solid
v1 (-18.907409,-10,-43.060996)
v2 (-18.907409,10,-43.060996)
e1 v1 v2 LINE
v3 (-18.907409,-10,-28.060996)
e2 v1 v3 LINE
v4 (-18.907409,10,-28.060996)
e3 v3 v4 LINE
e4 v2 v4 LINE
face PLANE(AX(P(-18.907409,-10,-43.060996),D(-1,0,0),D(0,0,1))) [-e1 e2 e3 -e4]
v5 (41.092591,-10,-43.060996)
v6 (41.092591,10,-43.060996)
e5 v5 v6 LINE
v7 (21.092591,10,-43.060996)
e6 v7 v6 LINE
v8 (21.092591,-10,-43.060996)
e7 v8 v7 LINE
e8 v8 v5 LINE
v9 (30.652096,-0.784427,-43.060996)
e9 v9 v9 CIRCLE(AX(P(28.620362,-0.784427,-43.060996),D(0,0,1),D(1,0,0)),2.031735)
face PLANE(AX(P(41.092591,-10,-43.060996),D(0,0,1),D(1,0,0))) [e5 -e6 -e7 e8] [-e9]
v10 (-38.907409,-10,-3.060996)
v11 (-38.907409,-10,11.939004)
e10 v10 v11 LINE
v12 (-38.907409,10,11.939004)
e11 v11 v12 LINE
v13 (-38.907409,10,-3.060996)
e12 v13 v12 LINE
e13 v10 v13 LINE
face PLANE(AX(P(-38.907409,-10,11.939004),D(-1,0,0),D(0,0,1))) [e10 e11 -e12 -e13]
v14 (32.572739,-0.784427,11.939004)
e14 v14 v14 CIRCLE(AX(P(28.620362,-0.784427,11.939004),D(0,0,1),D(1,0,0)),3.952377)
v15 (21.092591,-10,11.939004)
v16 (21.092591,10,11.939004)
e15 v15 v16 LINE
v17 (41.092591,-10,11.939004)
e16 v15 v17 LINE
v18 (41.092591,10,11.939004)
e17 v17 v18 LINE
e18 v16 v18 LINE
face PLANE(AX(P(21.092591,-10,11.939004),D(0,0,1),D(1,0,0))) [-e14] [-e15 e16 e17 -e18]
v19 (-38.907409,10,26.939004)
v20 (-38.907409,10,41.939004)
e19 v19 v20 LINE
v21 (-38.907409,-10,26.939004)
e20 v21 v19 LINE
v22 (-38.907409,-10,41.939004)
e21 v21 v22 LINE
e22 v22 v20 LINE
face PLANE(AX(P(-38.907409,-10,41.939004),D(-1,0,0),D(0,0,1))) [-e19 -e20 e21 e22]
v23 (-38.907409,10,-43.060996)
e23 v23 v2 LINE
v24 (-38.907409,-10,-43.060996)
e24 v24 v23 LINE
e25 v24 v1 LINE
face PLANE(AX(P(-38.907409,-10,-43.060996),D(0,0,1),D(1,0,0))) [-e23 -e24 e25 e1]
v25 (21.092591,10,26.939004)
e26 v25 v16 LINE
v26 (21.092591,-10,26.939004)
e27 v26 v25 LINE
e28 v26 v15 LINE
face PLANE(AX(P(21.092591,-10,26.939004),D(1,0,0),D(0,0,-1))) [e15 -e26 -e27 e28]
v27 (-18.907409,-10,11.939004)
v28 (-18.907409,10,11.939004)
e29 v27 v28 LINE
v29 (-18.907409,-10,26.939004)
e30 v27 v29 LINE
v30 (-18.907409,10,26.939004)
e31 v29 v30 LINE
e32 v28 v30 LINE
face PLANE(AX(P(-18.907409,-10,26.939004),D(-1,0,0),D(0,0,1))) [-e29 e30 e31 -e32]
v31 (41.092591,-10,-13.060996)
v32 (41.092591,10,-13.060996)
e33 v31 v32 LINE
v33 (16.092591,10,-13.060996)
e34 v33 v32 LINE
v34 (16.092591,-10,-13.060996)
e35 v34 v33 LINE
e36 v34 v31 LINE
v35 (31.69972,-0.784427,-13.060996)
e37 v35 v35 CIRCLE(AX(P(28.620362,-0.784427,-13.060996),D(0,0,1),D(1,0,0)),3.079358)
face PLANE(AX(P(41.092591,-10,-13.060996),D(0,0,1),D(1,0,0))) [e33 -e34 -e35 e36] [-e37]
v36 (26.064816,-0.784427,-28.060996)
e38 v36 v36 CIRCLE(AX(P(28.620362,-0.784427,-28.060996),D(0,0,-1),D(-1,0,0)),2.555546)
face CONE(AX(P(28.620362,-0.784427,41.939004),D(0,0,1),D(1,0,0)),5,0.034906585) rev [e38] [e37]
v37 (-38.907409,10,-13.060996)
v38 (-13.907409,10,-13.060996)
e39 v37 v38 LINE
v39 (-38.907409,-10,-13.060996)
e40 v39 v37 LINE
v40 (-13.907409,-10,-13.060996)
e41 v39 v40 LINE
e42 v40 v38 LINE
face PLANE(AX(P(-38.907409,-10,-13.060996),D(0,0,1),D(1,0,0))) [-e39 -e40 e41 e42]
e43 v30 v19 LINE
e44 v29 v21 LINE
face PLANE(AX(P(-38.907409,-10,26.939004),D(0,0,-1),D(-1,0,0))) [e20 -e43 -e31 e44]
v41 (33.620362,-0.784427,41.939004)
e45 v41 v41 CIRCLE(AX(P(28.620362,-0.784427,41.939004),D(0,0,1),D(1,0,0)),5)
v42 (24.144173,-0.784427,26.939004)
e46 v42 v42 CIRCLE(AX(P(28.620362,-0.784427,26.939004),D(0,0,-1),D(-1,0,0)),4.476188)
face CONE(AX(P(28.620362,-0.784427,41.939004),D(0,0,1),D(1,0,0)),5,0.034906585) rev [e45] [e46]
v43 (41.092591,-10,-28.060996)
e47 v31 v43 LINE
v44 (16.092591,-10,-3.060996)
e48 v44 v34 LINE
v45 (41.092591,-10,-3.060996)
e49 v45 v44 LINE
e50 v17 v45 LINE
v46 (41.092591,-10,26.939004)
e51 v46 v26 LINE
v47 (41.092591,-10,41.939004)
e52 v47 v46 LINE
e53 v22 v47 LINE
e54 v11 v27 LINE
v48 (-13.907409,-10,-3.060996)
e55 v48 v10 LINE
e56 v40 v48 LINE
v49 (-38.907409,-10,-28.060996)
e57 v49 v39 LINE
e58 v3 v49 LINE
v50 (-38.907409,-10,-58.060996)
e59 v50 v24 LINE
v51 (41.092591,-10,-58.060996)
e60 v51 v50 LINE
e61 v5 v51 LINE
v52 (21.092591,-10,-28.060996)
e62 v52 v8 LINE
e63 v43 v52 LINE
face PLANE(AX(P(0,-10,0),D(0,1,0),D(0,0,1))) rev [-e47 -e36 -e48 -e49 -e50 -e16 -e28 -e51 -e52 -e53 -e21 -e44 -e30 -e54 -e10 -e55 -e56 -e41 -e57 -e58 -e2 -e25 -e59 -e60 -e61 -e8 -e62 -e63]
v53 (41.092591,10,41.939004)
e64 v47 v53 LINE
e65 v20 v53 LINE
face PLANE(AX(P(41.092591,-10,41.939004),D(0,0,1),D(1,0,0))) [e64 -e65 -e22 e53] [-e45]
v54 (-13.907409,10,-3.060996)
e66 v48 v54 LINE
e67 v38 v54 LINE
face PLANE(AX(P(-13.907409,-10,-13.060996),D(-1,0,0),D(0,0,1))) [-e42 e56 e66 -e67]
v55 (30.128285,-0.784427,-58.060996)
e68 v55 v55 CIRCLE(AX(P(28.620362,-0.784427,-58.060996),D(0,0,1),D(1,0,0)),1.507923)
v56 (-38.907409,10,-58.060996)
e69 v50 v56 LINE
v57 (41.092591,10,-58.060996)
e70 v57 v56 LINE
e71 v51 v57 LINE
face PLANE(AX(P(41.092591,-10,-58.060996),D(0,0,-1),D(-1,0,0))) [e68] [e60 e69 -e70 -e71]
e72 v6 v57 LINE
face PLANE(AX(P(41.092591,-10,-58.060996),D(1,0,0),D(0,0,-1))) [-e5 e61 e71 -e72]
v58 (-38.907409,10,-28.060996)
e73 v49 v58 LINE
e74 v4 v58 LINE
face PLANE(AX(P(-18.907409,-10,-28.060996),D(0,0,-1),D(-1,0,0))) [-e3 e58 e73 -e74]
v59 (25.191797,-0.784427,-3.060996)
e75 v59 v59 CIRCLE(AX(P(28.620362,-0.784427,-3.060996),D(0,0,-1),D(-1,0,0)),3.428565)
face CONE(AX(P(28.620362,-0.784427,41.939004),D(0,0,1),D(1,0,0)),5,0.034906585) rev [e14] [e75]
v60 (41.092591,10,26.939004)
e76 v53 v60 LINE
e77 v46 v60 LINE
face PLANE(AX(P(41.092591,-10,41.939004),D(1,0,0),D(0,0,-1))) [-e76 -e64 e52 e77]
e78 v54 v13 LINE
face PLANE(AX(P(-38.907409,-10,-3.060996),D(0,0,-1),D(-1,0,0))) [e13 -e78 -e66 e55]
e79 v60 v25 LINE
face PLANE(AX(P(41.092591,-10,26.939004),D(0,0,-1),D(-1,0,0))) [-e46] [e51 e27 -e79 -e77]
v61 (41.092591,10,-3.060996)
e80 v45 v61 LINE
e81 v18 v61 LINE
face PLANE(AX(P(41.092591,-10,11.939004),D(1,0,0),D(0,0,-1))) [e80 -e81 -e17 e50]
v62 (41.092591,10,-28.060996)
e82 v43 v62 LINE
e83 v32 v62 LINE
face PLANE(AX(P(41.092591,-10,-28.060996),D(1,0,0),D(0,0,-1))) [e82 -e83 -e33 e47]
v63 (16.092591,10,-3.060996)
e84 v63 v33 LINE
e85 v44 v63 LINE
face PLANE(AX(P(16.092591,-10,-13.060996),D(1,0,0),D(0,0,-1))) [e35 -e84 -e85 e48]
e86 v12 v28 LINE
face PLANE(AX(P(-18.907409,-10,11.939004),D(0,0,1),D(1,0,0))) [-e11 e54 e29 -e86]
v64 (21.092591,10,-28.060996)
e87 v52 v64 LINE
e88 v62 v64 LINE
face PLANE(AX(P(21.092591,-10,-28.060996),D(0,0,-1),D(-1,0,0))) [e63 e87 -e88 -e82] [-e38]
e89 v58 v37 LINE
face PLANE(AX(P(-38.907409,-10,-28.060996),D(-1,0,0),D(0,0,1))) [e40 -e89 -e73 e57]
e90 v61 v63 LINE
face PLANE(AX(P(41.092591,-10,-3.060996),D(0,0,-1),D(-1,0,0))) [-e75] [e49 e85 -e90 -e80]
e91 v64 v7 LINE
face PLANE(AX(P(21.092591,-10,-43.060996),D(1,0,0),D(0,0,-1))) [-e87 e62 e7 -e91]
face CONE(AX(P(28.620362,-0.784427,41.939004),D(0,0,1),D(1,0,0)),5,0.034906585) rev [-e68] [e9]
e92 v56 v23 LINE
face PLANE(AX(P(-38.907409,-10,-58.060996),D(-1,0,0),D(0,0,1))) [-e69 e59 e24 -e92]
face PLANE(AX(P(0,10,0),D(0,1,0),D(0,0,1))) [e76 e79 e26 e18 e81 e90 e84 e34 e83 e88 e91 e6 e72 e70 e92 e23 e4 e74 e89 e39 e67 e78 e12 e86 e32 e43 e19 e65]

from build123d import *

# Parameters (mm, degrees)
BOSS_EXTRUDE1_DEPTH      = 10
BOSS_EXTRUDE1_DEPTH_BACK = 10


# Read off the part's stored shape, not the designer's step: Hole1
with BuildPart() as part:
    # Sketch1 → Boss-Extrude1 (new, two sides: drawn at the far end of the back side and taken through both)
    with BuildSketch(Plane(origin=(0, 0, 0), x_dir=(1, 0, 0), z_dir=(0, 1, 0)).offset(-BOSS_EXTRUDE1_DEPTH_BACK)):
        Polygon((41.092590889, 58.060996062), (-38.907409111, 58.060996062), (-38.907409111, 43.060996062), (-18.907409111, 43.060996062), (-18.907409111, 28.060996062), (-38.907409111, 28.060996062), (-38.907409111, 13.060996062), (-13.907409111, 13.060996062), (-13.907409111, 3.060996062), (-38.907409111, 3.060996062), (-38.907409111, -11.939003938), (-18.907409111, -11.939003938), (-18.907409111, -26.939003938), (-38.907409111, -26.939003938), (-38.907409111, -41.939003938), (41.092590889, -41.939003938), (41.092590889, -26.939003938), (21.092590889, -26.939003938), (21.092590889, -11.939003938), (41.092590889, -11.939003938), (41.092590889, 3.060996062), (16.092590889, 3.060996062), (16.092590889, 13.060996062), (41.092590889, 13.060996062), (41.092590889, 28.060996062), (21.092590889, 28.060996062), (21.092590889, 43.060996062), (41.092590889, 43.060996062), align=None)
    extrude(amount=BOSS_EXTRUDE1_DEPTH + BOSS_EXTRUDE1_DEPTH_BACK)

    # Hole1 outline → Hole1 (revolve, cut)
    with BuildSketch(Plane(origin=(28.620361889, -0.784426919, 0), x_dir=(1, 0, 0), z_dir=(0, -1, 0))):
        Polygon((5, 41.939003938), (0, 41.939003938), (0, 26.939003938), (4.476188458, 26.939003938), align=None)
        Polygon((3.428565373, -3.060996062), (3.952376915, 11.939003938), (0, 11.939003938), (0, -3.060996062), align=None)
        Polygon((2.555546136, -28.060996062), (3.079357678, -13.060996062), (0, -13.060996062), (0, -28.060996062), align=None)
        Polygon((1.507923051, -58.060996062), (2.031734593, -43.060996062), (0, -43.060996062), (0, -58.060996062), align=None)
    revolve(axis=Axis((28.620361889, -0.784426919, 0), (0, 0, 1)), mode=Mode.SUBTRACT)


solid = part.part
